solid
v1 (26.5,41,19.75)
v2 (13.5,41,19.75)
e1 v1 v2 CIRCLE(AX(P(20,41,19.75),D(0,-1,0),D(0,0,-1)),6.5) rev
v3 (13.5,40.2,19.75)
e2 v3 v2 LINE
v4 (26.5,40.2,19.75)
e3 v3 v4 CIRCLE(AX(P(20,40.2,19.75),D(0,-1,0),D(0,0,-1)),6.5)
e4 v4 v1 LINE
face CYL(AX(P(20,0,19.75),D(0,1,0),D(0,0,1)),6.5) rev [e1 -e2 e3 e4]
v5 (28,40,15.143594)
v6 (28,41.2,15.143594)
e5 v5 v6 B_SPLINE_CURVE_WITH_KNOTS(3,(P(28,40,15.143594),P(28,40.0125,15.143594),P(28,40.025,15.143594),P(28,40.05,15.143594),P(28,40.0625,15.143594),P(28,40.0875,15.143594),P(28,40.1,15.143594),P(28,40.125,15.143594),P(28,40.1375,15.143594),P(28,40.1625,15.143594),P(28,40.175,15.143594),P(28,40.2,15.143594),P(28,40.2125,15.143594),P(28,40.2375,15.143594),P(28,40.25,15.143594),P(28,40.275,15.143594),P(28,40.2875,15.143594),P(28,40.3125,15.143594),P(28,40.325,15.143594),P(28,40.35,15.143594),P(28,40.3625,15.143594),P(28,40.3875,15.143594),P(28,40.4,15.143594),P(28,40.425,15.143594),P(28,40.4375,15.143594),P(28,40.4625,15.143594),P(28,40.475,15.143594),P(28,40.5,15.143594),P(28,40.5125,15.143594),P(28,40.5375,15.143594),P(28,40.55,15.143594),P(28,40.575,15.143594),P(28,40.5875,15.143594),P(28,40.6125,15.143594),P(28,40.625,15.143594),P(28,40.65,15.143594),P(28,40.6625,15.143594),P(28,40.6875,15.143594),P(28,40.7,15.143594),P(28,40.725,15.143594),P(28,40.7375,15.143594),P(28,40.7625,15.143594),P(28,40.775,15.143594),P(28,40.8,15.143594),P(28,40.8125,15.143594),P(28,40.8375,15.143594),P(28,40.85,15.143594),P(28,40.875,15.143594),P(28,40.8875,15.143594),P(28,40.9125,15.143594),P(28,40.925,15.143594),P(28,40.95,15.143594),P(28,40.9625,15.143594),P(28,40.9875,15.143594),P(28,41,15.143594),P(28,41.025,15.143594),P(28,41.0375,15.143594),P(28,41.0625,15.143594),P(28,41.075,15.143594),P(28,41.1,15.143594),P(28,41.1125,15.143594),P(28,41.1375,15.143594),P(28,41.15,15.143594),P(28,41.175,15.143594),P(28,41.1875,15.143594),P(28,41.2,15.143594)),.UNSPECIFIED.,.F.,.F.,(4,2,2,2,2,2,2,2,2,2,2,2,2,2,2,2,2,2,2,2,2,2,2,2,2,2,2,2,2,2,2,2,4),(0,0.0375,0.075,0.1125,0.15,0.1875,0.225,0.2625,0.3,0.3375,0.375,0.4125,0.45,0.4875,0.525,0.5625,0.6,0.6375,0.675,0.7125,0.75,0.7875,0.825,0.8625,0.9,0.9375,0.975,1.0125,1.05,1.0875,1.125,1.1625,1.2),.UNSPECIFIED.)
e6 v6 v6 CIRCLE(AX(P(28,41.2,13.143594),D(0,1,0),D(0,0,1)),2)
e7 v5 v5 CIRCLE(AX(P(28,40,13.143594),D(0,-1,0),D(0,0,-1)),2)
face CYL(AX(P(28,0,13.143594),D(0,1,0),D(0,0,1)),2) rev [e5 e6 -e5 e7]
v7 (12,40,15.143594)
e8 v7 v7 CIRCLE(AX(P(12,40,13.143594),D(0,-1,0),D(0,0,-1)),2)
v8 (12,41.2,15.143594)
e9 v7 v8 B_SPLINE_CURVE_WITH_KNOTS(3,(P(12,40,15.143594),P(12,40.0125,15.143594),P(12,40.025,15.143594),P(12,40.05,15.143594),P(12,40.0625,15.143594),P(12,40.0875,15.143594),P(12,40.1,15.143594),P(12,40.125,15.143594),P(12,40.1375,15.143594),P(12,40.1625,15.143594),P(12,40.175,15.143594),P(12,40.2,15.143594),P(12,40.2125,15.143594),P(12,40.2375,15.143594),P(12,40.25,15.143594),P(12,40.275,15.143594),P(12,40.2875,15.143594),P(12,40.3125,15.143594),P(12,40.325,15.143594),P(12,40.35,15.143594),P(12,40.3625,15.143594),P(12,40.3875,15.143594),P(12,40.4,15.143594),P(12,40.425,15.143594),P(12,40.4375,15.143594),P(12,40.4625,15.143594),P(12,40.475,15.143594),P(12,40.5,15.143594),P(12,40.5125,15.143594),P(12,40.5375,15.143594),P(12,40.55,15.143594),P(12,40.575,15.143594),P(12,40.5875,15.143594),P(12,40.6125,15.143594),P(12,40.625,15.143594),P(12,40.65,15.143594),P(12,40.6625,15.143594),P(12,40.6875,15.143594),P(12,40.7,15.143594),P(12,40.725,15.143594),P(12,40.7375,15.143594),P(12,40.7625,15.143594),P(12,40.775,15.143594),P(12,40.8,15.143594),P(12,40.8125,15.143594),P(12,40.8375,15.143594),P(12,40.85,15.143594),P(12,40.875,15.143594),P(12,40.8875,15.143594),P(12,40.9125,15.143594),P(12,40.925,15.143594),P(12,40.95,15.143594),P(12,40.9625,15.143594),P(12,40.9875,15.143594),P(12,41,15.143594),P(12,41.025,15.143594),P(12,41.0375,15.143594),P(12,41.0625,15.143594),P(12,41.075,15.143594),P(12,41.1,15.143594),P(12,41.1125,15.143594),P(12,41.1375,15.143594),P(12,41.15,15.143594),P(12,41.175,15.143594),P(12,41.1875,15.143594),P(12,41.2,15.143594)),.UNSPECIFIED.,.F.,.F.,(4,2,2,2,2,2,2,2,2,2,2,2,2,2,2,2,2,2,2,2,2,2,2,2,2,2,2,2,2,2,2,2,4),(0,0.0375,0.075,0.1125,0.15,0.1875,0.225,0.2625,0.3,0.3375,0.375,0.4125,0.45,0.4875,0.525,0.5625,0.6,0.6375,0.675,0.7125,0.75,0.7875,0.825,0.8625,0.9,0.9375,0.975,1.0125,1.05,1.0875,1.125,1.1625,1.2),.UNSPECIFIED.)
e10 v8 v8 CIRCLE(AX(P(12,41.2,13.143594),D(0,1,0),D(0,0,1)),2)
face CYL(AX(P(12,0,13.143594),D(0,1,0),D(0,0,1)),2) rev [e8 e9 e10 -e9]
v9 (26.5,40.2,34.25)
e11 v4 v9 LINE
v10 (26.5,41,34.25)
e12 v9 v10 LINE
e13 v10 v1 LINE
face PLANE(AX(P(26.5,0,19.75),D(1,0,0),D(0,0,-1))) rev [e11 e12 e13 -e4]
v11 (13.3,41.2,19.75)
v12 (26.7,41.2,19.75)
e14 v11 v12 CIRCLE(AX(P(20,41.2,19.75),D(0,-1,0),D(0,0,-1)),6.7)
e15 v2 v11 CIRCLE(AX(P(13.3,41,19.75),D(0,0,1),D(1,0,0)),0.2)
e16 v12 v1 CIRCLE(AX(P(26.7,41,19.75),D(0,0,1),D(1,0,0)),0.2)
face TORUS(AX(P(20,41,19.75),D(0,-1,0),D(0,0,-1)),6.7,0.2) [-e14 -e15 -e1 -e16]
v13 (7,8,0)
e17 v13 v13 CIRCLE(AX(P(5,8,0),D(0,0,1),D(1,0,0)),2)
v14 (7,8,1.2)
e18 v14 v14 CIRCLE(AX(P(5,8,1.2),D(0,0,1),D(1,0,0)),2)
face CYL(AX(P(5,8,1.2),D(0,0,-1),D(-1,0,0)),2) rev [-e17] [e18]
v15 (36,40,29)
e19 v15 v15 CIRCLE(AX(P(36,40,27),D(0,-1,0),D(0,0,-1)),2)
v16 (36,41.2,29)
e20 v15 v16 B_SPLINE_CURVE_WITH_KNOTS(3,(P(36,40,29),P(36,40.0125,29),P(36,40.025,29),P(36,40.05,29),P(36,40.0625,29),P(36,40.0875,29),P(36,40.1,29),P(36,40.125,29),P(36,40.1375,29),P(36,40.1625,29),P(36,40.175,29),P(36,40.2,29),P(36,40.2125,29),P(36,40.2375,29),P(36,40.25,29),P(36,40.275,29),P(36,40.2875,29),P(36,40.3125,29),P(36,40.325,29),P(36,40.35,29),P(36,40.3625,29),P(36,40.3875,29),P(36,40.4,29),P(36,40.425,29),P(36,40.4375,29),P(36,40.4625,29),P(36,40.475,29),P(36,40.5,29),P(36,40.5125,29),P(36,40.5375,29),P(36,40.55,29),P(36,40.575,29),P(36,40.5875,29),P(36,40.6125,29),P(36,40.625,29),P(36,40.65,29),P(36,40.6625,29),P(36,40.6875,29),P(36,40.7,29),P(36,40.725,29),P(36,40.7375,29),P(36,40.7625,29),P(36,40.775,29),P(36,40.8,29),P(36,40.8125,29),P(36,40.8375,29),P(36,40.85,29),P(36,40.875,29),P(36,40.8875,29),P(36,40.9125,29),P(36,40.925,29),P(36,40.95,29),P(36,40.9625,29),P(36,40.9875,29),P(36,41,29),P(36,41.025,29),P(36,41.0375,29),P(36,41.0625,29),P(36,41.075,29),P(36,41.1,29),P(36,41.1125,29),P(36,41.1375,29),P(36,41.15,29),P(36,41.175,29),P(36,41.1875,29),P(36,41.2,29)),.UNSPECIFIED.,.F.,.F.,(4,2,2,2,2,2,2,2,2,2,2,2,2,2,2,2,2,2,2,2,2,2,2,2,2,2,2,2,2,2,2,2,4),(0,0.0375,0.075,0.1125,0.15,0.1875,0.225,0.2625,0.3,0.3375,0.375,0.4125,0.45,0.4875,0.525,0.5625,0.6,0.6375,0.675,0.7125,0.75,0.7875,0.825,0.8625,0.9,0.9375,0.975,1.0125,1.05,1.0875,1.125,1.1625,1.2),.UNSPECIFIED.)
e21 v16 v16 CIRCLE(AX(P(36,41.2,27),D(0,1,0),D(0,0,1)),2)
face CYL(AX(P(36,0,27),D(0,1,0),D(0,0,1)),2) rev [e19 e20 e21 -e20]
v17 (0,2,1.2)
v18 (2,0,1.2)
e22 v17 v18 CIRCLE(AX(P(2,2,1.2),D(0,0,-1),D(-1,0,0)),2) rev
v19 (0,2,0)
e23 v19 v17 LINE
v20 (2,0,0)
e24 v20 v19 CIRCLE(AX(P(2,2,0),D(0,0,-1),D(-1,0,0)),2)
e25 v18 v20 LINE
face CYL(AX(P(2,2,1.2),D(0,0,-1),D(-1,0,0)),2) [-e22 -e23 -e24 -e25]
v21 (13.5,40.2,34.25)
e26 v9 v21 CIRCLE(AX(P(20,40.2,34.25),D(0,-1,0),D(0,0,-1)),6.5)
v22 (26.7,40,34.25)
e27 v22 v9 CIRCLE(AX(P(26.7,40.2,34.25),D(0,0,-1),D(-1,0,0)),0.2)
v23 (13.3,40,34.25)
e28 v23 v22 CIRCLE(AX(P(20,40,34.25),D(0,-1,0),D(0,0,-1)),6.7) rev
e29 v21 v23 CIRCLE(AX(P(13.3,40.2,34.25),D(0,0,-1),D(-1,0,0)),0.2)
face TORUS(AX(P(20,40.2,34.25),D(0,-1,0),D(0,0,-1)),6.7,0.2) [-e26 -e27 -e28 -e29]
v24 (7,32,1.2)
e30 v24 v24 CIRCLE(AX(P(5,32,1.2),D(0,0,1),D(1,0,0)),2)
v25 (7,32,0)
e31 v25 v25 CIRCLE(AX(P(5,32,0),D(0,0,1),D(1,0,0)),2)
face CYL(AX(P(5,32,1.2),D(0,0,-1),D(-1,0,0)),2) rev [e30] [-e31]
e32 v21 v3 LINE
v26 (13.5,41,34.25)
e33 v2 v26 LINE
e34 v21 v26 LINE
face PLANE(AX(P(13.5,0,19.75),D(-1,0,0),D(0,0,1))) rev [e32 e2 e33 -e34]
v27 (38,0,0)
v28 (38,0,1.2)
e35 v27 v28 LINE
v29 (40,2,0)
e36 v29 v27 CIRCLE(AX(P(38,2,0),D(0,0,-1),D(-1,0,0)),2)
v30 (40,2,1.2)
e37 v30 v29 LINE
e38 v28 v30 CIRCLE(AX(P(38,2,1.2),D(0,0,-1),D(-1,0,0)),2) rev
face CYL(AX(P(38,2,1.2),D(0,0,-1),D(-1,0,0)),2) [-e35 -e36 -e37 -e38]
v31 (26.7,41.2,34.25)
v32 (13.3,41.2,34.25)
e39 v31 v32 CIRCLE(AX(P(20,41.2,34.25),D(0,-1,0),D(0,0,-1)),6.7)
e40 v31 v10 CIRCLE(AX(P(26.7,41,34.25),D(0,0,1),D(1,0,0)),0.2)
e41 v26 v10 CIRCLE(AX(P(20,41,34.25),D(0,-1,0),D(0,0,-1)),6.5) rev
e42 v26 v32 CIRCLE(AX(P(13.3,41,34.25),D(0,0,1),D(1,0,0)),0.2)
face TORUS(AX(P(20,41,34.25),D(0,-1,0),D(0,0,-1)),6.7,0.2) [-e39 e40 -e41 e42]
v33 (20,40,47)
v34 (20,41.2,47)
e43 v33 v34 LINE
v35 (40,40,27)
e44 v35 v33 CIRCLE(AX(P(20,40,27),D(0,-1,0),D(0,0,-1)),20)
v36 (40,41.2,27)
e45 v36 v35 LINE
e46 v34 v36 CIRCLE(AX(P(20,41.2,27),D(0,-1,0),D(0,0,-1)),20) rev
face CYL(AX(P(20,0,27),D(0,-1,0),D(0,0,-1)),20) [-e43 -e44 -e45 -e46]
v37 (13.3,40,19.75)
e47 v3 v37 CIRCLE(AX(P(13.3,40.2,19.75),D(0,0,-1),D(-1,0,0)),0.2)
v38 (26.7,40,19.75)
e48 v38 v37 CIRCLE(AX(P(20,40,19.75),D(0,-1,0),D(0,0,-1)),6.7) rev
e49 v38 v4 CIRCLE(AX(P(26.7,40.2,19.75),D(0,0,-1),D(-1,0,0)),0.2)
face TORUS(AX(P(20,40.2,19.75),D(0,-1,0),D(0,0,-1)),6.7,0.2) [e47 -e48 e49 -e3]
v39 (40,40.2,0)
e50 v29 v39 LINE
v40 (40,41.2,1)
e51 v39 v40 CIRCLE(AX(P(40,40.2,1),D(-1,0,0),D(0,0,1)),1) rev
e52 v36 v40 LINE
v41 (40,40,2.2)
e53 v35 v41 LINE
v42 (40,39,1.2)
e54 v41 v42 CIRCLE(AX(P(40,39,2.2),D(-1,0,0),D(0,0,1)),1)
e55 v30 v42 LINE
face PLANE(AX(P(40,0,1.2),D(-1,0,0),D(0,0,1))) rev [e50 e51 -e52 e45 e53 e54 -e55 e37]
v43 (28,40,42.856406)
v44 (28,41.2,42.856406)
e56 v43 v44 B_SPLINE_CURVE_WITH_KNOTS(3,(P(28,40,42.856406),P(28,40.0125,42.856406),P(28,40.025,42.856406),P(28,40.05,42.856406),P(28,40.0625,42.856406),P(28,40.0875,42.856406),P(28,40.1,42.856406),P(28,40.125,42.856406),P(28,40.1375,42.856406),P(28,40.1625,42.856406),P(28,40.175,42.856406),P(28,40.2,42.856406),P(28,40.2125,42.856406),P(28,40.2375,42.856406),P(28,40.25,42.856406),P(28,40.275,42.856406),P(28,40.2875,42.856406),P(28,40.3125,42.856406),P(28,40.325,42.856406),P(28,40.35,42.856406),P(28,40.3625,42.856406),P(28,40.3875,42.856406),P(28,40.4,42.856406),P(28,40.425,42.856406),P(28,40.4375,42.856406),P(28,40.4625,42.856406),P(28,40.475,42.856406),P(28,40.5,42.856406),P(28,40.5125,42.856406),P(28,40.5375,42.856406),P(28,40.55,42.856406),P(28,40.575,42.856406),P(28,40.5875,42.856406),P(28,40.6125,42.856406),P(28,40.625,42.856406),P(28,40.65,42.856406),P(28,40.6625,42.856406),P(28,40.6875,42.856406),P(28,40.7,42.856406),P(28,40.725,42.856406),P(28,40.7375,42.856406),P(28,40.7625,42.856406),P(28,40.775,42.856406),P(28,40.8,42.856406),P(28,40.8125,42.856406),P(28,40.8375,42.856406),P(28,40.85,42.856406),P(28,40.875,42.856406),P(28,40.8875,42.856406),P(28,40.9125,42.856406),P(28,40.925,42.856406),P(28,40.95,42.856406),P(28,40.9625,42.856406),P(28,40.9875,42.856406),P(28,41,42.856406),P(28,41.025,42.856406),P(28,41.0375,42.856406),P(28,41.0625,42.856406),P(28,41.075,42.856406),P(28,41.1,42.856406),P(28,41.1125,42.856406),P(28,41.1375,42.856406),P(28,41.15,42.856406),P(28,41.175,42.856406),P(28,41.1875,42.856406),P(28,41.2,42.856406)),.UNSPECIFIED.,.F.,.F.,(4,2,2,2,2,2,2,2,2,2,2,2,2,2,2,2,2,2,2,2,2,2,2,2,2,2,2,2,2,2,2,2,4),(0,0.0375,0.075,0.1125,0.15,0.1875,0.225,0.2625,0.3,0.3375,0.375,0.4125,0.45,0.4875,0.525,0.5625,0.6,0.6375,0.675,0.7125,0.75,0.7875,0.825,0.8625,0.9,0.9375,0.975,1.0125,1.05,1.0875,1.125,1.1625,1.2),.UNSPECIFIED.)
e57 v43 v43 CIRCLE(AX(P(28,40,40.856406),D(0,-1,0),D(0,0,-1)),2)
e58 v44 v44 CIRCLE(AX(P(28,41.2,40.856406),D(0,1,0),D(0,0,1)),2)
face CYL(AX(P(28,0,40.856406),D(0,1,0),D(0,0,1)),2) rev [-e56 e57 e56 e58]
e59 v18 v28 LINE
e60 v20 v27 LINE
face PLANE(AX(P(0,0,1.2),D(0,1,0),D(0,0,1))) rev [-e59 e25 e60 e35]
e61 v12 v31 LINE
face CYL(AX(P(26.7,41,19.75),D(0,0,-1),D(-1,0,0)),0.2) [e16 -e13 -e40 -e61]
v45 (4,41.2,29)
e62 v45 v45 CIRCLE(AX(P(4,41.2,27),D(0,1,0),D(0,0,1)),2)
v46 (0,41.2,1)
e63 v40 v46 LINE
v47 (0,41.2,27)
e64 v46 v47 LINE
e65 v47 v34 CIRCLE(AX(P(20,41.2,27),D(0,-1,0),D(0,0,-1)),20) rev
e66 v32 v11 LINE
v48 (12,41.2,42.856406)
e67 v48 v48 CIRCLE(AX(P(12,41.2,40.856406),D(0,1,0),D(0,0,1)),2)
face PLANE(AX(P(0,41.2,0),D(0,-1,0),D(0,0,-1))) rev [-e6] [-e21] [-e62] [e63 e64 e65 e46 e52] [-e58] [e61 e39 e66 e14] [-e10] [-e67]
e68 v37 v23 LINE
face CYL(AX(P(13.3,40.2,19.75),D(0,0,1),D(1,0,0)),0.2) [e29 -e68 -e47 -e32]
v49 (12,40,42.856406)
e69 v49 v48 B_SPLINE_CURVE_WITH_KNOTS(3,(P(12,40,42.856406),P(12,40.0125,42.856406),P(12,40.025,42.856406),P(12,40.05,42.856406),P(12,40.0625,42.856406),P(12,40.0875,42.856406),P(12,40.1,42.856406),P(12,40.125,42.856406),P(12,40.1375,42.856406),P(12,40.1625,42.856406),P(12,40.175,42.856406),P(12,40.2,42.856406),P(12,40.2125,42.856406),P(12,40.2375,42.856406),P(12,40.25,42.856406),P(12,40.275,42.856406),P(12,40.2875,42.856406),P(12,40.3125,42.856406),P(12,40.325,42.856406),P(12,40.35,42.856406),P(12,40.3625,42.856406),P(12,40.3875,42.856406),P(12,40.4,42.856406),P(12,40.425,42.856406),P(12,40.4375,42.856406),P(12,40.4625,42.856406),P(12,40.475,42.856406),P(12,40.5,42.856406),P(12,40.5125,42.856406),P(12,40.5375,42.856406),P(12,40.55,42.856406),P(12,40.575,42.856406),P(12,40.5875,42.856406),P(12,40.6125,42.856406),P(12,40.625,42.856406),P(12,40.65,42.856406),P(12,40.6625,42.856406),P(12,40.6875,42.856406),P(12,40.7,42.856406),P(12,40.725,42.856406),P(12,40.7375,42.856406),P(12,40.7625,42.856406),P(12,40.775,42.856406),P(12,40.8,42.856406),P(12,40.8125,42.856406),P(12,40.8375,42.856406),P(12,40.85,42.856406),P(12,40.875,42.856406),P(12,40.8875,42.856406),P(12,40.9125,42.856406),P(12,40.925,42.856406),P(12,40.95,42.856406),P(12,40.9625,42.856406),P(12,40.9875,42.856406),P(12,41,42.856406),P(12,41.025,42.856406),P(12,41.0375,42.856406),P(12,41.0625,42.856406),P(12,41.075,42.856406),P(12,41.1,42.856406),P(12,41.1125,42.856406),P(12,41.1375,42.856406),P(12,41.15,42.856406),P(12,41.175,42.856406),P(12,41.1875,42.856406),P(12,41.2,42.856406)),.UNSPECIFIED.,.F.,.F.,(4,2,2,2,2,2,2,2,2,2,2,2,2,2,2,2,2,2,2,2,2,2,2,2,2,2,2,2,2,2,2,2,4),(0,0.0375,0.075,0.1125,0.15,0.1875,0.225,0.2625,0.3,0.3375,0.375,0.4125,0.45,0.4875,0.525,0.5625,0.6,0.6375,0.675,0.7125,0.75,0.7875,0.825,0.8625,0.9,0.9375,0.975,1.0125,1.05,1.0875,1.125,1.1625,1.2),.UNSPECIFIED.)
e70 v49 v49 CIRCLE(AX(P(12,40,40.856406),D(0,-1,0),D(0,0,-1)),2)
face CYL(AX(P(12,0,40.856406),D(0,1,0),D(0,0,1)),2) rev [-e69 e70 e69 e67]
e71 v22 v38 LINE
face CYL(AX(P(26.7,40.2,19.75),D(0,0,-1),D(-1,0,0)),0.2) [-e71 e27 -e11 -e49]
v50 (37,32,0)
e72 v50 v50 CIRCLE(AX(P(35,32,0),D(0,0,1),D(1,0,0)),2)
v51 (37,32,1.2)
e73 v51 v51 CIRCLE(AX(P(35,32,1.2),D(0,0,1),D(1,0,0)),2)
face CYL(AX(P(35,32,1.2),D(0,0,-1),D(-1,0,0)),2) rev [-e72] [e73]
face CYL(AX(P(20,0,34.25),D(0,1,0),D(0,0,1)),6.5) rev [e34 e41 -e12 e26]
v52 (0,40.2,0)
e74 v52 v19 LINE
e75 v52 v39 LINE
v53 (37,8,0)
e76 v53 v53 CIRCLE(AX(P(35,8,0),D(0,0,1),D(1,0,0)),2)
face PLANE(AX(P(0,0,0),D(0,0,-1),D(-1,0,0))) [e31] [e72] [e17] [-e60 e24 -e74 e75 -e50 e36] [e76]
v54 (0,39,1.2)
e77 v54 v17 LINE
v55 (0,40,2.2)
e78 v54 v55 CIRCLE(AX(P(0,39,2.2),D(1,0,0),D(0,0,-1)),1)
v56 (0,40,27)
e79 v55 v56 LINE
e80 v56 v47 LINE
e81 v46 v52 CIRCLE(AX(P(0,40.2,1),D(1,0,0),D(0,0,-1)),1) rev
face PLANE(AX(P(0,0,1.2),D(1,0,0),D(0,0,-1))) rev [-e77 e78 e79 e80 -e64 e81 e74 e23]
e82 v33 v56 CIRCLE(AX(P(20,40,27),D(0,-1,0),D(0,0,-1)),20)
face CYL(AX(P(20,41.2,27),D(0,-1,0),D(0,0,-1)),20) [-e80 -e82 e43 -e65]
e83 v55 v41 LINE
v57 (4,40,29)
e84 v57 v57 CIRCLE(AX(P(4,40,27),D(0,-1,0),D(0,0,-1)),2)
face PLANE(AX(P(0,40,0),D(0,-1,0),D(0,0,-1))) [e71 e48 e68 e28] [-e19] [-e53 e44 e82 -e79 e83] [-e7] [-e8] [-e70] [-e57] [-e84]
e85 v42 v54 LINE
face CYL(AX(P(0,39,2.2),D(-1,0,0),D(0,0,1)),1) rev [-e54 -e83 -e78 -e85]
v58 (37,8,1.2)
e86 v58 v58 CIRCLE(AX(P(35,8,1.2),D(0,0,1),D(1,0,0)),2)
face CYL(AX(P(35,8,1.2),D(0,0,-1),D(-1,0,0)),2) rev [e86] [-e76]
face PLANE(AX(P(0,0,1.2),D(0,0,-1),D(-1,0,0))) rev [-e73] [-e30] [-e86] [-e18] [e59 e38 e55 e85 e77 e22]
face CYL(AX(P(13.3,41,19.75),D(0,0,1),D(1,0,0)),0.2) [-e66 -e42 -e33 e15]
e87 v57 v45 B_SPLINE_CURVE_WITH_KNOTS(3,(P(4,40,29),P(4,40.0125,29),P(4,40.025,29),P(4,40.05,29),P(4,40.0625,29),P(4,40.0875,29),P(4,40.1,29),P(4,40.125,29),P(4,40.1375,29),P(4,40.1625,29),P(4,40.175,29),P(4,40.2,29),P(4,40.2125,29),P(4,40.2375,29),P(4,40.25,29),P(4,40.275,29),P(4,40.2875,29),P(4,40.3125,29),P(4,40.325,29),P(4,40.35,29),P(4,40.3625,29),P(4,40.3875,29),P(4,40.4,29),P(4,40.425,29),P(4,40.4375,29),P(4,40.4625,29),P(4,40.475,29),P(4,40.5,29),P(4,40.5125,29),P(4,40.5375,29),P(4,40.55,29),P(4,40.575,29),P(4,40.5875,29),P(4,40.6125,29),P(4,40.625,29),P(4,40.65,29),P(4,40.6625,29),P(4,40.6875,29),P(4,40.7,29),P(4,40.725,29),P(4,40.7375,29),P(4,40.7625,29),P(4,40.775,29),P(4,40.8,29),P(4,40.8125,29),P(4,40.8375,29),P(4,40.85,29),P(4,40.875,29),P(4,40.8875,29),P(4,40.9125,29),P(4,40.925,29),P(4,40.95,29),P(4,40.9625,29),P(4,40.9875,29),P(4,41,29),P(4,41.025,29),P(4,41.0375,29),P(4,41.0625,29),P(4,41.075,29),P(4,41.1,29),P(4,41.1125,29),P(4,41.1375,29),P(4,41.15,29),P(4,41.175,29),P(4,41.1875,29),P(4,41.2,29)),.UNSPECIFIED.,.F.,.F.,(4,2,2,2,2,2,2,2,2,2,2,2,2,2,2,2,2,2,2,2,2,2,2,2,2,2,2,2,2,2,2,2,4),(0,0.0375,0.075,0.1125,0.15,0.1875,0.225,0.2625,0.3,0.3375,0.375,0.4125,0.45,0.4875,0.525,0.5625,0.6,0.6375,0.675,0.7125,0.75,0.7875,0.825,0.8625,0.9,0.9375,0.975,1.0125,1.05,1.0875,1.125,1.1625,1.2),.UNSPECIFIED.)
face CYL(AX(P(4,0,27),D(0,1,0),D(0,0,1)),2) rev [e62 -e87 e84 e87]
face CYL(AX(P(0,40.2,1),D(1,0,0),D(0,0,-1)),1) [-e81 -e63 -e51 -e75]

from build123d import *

# Parameters (mm, degrees)
SKETCH_2_W          = 40
SKETCH_2_H          = 40
SKETCH_2_R          = 2
EXTRUDE_1_DEPTH     = 1.2
SKETCH_3_W          = 40
SKETCH_3_H          = 47
EXTRUDE_2_DEPTH     = 1.2
FILLET_1_R          = 1
FILLET_2_R          = 20
FILLET_3_R          = 2
CUT_EXTRUDE_1_DEPTH = 75.20539064
SKETCH_7_R          = 2
CUT_EXTRUDE_3_DEPTH = 75.20539064
FILLET_4_R          = 0.2


with BuildPart() as part:
    # 草图2 → 凸台-拉伸1 (new body)
    with BuildSketch(Plane.XY):
        with Locations((20, 20)):
            Rectangle(SKETCH_2_W, SKETCH_2_H)
        with Locations((5, 32)):
            Circle(SKETCH_2_R, mode=Mode.SUBTRACT)
        with Locations((35, 8)):
            Circle(SKETCH_2_R, mode=Mode.SUBTRACT)
        with Locations((5, 8)):
            Circle(SKETCH_2_R, mode=Mode.SUBTRACT)
        with Locations((35, 32)):
            Circle(SKETCH_2_R, mode=Mode.SUBTRACT)
    extrude(amount=EXTRUDE_1_DEPTH)

    # 草图3 → 凸台-拉伸2 (add)
    with BuildSketch(Plane(origin=(0, 40, 0), x_dir=(1, 0, 0), z_dir=(0, 1, 0))):
        with Locations((20, -23.5)):
            Rectangle(SKETCH_3_W, SKETCH_3_H)
    extrude(amount=EXTRUDE_2_DEPTH)

    # 圆角1
    fillet_1_edges = [part.edges().sort_by_distance(p)[0] for p in [
        (20, 40, 1.2),
        (20, 41.2, 0),
    ]]
    fillet(fillet_1_edges, radius=FILLET_1_R)

    # 圆角2
    fillet_2_edges = [part.edges().sort_by_distance(p)[0] for p in [
        (0, 40.6, 47),
        (40, 40.6, 47),
    ]]
    fillet(fillet_2_edges, radius=FILLET_2_R - 0.0001)  # a hair under: the kernel refuses the full size

    # 圆角3
    fillet_3_edges = [part.edges().sort_by_distance(p)[0] for p in [
        (40, 0, 0.6),
        (0, 0, 0.6),
    ]]
    fillet(fillet_3_edges, radius=FILLET_3_R)

    # 草图5 → 切除-拉伸1 (cut, through all)
    with BuildSketch(Plane(origin=(0, 41.2, 0), x_dir=(1, 0, 0), z_dir=(0, 1, 0))):
        with BuildLine():
            Line((26.5, -19.75), (26.5, -34.25))
            ThreePointArc((26.5, -34.25), (20, -40.75), (13.5, -34.25))
            Line((13.5, -34.25), (13.5, -19.75))
            ThreePointArc((13.5, -19.75), (20, -13.25), (26.5, -19.75))
        make_face()
    extrude(amount=-CUT_EXTRUDE_1_DEPTH, mode=Mode.SUBTRACT)

    # 草图7 → 切除-拉伸3 (cut, through all)
    with BuildSketch(Plane(origin=(0, 41.2, 0), x_dir=(1, 0, 0), z_dir=(0, 1, 0))):
        with Locations(Location((36, -27, 0), (0, 0, 270))):
            Circle(SKETCH_7_R)
        with Locations(Location((4, -27, 0), (0, 0, 270))):
            Circle(SKETCH_7_R)
        with Locations(Location((28, -40.856406461, 0), (0, 0, 270))):
            Circle(SKETCH_7_R)
        with Locations(Location((12, -40.856406461, 0), (0, 0, 270))):
            Circle(SKETCH_7_R)
        with Locations(Location((28, -13.143593539, 0), (0, 0, 270))):
            Circle(SKETCH_7_R)
        with Locations(Location((12, -13.143593539, 0), (0, 0, 270))):
            Circle(SKETCH_7_R)
    extrude(amount=-CUT_EXTRUDE_3_DEPTH, mode=Mode.SUBTRACT)

    # 圆角4
    fillet_4_edges = [part.edges().sort_by_distance(p)[0] for p in [
        (20, 40, 13.25),
        (26.5, 40, 27),
        (20, 40, 40.75),
        (13.5, 40, 27),
        (20, 41.2, 13.25),
        (13.5, 41.2, 27),
        (20, 41.2, 40.75),
        (26.5, 41.2, 27),
    ]]
    fillet(fillet_4_edges, radius=FILLET_4_R)


solid = part.part
